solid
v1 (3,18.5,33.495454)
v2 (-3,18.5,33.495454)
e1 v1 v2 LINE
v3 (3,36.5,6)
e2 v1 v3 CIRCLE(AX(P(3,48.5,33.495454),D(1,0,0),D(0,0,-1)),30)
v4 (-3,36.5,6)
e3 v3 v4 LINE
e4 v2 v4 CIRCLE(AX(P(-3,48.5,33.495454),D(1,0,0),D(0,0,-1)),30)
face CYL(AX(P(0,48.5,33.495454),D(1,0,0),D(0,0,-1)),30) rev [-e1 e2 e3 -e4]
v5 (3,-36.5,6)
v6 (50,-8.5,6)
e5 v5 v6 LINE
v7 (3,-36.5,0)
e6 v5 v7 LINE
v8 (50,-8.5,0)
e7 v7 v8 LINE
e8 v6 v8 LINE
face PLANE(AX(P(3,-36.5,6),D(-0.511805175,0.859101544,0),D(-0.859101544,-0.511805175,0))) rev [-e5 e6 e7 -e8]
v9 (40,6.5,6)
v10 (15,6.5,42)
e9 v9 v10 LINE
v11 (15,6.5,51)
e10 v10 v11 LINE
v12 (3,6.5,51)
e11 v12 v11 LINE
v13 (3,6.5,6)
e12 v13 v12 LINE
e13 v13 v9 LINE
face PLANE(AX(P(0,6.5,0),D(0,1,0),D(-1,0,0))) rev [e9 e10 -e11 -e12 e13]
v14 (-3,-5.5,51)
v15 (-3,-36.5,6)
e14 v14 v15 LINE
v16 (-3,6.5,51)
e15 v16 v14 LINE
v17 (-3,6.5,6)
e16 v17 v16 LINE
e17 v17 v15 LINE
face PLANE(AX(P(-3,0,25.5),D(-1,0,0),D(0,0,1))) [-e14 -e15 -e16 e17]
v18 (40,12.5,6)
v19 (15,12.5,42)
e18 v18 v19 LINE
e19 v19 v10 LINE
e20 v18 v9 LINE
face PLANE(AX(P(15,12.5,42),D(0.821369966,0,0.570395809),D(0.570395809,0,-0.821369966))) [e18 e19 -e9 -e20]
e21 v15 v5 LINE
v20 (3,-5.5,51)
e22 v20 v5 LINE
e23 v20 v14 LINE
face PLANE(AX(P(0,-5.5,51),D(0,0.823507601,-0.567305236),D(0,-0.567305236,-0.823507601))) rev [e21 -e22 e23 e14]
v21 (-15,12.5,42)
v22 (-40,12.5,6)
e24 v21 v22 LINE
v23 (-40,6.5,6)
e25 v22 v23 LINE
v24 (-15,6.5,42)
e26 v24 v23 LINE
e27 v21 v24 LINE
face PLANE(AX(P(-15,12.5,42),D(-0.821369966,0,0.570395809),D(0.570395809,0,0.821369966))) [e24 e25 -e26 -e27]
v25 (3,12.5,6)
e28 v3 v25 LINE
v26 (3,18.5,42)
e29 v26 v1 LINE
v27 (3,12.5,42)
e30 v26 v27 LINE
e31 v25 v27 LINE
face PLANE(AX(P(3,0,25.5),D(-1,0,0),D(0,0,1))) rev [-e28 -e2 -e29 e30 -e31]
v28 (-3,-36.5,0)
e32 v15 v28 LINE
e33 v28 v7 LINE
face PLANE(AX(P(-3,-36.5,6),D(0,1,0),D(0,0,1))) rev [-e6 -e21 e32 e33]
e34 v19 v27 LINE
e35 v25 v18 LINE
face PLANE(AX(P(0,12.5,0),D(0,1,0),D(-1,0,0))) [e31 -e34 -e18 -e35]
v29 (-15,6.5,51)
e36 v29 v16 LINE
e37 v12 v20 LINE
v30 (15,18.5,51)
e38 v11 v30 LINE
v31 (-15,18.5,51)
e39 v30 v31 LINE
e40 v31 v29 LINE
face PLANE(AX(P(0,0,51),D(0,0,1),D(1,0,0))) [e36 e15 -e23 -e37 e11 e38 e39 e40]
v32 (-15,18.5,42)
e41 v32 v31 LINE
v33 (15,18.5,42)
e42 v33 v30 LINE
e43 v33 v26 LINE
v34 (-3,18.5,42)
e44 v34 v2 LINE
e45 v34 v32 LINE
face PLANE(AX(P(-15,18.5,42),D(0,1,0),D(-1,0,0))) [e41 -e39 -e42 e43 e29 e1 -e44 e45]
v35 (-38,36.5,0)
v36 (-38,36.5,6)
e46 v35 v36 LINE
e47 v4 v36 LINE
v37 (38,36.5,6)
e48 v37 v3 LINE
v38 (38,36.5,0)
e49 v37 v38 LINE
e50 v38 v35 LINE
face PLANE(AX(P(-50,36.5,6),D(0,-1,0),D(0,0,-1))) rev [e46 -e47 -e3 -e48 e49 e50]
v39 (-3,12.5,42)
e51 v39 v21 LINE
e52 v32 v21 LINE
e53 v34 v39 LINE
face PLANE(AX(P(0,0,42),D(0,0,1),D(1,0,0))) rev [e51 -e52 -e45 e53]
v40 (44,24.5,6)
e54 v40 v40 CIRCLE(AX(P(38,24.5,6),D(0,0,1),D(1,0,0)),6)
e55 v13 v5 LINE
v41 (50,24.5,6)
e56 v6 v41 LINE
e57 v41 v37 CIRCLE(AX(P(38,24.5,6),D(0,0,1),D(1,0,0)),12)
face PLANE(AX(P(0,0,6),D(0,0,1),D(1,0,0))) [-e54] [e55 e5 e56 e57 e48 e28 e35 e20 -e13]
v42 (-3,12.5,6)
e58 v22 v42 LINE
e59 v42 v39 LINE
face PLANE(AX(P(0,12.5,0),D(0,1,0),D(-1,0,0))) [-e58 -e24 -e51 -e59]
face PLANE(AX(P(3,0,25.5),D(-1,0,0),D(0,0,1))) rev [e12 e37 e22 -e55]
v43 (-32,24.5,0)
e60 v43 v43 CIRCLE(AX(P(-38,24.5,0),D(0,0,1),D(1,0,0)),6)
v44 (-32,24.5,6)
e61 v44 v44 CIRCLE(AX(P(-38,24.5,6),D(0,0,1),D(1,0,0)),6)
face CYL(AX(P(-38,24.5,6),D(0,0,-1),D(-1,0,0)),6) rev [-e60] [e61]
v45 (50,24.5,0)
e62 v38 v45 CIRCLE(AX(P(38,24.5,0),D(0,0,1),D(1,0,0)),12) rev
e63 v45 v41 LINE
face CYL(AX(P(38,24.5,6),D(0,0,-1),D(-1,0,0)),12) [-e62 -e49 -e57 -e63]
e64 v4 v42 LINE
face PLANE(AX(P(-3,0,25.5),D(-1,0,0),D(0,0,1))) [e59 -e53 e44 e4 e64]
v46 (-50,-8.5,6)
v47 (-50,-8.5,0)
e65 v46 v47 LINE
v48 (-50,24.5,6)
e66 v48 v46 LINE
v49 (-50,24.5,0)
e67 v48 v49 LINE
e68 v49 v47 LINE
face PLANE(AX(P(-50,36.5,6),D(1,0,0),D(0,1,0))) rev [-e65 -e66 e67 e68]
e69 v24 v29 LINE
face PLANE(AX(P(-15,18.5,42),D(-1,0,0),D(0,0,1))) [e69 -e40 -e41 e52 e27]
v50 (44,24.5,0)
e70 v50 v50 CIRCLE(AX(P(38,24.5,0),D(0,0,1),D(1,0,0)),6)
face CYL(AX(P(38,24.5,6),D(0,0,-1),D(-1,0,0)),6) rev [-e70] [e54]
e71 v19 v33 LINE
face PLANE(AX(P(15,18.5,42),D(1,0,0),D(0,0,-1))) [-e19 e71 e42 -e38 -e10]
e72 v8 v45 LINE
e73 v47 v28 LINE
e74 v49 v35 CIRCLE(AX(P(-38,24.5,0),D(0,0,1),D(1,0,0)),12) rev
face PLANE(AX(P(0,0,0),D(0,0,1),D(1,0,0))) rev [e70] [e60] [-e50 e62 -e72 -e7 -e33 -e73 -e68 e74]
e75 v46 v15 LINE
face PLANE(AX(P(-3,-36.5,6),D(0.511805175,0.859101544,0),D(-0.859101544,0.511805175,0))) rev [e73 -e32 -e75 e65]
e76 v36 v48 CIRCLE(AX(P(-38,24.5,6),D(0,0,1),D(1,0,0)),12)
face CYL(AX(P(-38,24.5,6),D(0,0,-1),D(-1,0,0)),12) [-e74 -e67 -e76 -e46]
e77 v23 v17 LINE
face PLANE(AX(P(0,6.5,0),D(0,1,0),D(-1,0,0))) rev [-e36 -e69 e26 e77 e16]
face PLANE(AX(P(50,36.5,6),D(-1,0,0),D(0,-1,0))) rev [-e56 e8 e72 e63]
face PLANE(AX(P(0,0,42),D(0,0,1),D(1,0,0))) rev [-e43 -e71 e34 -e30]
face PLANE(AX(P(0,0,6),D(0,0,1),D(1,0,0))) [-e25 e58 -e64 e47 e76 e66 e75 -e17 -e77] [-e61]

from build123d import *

# Parameters (mm, degrees)
BOSS_EXTRUDE1_DEPTH = 6
SKETCH3_W           = 30
SKETCH3_H           = 12
BOSS_EXTRUDE2_DEPTH = 9
BOSS_EXTRUDE3_DEPTH = 6
RIB1_START          = -3
RIB1_DEPTH          = 6
RIB2_START          = -3
RIB2_DEPTH          = 6
SKETCH9_R           = 6
CUT_EXTRUDE1_DEPTH  = 6
FILLET1_R           = 12


# Read off the part's stored shape, not the designer's step: Rib1, Rib2
with BuildPart() as part:
    # Sketch1 → Boss-Extrude1 (new body)
    with BuildSketch(Plane.XY):
        Polygon((-50, 36.5), (50, 36.5), (50, -8.5), (3, -36.5), (-3, -36.5), (-50, -8.5), align=None)
    extrude(amount=BOSS_EXTRUDE1_DEPTH)



with BuildPart() as body_2:
    # Sketch3 → Boss-Extrude2 (new body)
    with BuildSketch(Plane.XY.offset(51)):
        with Locations((0, 12.5)):
            Rectangle(SKETCH3_W, SKETCH3_H)
    extrude(amount=-BOSS_EXTRUDE2_DEPTH)


with BuildPart() as part_1:
    add(part.part)

    add(body_2.part)  # Boss-Extrude3 merges body 2
    # Sketch5 → Boss-Extrude3 (add)
    with BuildSketch(Plane(origin=(0, 6.5, 0), x_dir=(-1, 0, 0), z_dir=(0, -1, 0))):
        Polygon((15, -42), (40, -6), (-40, -6), (-15, -42), align=None)
    extrude(amount=-BOSS_EXTRUDE3_DEPTH)

    # Rib1 outline → Rib1 (add)
    with BuildSketch(Plane.ZY.offset(RIB1_START)):
        Polygon((6, -36.5), (51, -5.5), (51, 6.5), (6, 6.5), align=None)
    extrude(amount=RIB1_DEPTH)

    # Rib2 outline → Rib2 (add)
    with BuildSketch(Plane.ZY.offset(RIB2_START)):
        with BuildLine():
            Line((42, 12.5), (42, 18.5))
            Line((42, 18.5), (33.49545417, 18.5))
            ThreePointArc((33.49545417, 18.5), (17.063777445, 23.400199204), (6, 36.5))
            Line((6, 36.5), (6, 12.5))
            Line((6, 12.5), (42, 12.5))
        make_face()
    extrude(amount=RIB2_DEPTH)

    # Sketch9 → Cut-Extrude1 (cut)
    with BuildSketch(Plane.XY):
        with Locations((-38, 24.5)):
            Circle(SKETCH9_R)
        with Locations((38, 24.5)):
            Circle(SKETCH9_R)
    extrude(amount=CUT_EXTRUDE1_DEPTH, mode=Mode.SUBTRACT)

    # Fillet1
    fillet1_edges = [part_1.edges().sort_by_distance(p)[0] for p in [
        (-50, 36.5, 3),
        (50, 36.5, 3),
    ]]
    fillet(fillet1_edges, radius=FILLET1_R)


solid = part_1.part
